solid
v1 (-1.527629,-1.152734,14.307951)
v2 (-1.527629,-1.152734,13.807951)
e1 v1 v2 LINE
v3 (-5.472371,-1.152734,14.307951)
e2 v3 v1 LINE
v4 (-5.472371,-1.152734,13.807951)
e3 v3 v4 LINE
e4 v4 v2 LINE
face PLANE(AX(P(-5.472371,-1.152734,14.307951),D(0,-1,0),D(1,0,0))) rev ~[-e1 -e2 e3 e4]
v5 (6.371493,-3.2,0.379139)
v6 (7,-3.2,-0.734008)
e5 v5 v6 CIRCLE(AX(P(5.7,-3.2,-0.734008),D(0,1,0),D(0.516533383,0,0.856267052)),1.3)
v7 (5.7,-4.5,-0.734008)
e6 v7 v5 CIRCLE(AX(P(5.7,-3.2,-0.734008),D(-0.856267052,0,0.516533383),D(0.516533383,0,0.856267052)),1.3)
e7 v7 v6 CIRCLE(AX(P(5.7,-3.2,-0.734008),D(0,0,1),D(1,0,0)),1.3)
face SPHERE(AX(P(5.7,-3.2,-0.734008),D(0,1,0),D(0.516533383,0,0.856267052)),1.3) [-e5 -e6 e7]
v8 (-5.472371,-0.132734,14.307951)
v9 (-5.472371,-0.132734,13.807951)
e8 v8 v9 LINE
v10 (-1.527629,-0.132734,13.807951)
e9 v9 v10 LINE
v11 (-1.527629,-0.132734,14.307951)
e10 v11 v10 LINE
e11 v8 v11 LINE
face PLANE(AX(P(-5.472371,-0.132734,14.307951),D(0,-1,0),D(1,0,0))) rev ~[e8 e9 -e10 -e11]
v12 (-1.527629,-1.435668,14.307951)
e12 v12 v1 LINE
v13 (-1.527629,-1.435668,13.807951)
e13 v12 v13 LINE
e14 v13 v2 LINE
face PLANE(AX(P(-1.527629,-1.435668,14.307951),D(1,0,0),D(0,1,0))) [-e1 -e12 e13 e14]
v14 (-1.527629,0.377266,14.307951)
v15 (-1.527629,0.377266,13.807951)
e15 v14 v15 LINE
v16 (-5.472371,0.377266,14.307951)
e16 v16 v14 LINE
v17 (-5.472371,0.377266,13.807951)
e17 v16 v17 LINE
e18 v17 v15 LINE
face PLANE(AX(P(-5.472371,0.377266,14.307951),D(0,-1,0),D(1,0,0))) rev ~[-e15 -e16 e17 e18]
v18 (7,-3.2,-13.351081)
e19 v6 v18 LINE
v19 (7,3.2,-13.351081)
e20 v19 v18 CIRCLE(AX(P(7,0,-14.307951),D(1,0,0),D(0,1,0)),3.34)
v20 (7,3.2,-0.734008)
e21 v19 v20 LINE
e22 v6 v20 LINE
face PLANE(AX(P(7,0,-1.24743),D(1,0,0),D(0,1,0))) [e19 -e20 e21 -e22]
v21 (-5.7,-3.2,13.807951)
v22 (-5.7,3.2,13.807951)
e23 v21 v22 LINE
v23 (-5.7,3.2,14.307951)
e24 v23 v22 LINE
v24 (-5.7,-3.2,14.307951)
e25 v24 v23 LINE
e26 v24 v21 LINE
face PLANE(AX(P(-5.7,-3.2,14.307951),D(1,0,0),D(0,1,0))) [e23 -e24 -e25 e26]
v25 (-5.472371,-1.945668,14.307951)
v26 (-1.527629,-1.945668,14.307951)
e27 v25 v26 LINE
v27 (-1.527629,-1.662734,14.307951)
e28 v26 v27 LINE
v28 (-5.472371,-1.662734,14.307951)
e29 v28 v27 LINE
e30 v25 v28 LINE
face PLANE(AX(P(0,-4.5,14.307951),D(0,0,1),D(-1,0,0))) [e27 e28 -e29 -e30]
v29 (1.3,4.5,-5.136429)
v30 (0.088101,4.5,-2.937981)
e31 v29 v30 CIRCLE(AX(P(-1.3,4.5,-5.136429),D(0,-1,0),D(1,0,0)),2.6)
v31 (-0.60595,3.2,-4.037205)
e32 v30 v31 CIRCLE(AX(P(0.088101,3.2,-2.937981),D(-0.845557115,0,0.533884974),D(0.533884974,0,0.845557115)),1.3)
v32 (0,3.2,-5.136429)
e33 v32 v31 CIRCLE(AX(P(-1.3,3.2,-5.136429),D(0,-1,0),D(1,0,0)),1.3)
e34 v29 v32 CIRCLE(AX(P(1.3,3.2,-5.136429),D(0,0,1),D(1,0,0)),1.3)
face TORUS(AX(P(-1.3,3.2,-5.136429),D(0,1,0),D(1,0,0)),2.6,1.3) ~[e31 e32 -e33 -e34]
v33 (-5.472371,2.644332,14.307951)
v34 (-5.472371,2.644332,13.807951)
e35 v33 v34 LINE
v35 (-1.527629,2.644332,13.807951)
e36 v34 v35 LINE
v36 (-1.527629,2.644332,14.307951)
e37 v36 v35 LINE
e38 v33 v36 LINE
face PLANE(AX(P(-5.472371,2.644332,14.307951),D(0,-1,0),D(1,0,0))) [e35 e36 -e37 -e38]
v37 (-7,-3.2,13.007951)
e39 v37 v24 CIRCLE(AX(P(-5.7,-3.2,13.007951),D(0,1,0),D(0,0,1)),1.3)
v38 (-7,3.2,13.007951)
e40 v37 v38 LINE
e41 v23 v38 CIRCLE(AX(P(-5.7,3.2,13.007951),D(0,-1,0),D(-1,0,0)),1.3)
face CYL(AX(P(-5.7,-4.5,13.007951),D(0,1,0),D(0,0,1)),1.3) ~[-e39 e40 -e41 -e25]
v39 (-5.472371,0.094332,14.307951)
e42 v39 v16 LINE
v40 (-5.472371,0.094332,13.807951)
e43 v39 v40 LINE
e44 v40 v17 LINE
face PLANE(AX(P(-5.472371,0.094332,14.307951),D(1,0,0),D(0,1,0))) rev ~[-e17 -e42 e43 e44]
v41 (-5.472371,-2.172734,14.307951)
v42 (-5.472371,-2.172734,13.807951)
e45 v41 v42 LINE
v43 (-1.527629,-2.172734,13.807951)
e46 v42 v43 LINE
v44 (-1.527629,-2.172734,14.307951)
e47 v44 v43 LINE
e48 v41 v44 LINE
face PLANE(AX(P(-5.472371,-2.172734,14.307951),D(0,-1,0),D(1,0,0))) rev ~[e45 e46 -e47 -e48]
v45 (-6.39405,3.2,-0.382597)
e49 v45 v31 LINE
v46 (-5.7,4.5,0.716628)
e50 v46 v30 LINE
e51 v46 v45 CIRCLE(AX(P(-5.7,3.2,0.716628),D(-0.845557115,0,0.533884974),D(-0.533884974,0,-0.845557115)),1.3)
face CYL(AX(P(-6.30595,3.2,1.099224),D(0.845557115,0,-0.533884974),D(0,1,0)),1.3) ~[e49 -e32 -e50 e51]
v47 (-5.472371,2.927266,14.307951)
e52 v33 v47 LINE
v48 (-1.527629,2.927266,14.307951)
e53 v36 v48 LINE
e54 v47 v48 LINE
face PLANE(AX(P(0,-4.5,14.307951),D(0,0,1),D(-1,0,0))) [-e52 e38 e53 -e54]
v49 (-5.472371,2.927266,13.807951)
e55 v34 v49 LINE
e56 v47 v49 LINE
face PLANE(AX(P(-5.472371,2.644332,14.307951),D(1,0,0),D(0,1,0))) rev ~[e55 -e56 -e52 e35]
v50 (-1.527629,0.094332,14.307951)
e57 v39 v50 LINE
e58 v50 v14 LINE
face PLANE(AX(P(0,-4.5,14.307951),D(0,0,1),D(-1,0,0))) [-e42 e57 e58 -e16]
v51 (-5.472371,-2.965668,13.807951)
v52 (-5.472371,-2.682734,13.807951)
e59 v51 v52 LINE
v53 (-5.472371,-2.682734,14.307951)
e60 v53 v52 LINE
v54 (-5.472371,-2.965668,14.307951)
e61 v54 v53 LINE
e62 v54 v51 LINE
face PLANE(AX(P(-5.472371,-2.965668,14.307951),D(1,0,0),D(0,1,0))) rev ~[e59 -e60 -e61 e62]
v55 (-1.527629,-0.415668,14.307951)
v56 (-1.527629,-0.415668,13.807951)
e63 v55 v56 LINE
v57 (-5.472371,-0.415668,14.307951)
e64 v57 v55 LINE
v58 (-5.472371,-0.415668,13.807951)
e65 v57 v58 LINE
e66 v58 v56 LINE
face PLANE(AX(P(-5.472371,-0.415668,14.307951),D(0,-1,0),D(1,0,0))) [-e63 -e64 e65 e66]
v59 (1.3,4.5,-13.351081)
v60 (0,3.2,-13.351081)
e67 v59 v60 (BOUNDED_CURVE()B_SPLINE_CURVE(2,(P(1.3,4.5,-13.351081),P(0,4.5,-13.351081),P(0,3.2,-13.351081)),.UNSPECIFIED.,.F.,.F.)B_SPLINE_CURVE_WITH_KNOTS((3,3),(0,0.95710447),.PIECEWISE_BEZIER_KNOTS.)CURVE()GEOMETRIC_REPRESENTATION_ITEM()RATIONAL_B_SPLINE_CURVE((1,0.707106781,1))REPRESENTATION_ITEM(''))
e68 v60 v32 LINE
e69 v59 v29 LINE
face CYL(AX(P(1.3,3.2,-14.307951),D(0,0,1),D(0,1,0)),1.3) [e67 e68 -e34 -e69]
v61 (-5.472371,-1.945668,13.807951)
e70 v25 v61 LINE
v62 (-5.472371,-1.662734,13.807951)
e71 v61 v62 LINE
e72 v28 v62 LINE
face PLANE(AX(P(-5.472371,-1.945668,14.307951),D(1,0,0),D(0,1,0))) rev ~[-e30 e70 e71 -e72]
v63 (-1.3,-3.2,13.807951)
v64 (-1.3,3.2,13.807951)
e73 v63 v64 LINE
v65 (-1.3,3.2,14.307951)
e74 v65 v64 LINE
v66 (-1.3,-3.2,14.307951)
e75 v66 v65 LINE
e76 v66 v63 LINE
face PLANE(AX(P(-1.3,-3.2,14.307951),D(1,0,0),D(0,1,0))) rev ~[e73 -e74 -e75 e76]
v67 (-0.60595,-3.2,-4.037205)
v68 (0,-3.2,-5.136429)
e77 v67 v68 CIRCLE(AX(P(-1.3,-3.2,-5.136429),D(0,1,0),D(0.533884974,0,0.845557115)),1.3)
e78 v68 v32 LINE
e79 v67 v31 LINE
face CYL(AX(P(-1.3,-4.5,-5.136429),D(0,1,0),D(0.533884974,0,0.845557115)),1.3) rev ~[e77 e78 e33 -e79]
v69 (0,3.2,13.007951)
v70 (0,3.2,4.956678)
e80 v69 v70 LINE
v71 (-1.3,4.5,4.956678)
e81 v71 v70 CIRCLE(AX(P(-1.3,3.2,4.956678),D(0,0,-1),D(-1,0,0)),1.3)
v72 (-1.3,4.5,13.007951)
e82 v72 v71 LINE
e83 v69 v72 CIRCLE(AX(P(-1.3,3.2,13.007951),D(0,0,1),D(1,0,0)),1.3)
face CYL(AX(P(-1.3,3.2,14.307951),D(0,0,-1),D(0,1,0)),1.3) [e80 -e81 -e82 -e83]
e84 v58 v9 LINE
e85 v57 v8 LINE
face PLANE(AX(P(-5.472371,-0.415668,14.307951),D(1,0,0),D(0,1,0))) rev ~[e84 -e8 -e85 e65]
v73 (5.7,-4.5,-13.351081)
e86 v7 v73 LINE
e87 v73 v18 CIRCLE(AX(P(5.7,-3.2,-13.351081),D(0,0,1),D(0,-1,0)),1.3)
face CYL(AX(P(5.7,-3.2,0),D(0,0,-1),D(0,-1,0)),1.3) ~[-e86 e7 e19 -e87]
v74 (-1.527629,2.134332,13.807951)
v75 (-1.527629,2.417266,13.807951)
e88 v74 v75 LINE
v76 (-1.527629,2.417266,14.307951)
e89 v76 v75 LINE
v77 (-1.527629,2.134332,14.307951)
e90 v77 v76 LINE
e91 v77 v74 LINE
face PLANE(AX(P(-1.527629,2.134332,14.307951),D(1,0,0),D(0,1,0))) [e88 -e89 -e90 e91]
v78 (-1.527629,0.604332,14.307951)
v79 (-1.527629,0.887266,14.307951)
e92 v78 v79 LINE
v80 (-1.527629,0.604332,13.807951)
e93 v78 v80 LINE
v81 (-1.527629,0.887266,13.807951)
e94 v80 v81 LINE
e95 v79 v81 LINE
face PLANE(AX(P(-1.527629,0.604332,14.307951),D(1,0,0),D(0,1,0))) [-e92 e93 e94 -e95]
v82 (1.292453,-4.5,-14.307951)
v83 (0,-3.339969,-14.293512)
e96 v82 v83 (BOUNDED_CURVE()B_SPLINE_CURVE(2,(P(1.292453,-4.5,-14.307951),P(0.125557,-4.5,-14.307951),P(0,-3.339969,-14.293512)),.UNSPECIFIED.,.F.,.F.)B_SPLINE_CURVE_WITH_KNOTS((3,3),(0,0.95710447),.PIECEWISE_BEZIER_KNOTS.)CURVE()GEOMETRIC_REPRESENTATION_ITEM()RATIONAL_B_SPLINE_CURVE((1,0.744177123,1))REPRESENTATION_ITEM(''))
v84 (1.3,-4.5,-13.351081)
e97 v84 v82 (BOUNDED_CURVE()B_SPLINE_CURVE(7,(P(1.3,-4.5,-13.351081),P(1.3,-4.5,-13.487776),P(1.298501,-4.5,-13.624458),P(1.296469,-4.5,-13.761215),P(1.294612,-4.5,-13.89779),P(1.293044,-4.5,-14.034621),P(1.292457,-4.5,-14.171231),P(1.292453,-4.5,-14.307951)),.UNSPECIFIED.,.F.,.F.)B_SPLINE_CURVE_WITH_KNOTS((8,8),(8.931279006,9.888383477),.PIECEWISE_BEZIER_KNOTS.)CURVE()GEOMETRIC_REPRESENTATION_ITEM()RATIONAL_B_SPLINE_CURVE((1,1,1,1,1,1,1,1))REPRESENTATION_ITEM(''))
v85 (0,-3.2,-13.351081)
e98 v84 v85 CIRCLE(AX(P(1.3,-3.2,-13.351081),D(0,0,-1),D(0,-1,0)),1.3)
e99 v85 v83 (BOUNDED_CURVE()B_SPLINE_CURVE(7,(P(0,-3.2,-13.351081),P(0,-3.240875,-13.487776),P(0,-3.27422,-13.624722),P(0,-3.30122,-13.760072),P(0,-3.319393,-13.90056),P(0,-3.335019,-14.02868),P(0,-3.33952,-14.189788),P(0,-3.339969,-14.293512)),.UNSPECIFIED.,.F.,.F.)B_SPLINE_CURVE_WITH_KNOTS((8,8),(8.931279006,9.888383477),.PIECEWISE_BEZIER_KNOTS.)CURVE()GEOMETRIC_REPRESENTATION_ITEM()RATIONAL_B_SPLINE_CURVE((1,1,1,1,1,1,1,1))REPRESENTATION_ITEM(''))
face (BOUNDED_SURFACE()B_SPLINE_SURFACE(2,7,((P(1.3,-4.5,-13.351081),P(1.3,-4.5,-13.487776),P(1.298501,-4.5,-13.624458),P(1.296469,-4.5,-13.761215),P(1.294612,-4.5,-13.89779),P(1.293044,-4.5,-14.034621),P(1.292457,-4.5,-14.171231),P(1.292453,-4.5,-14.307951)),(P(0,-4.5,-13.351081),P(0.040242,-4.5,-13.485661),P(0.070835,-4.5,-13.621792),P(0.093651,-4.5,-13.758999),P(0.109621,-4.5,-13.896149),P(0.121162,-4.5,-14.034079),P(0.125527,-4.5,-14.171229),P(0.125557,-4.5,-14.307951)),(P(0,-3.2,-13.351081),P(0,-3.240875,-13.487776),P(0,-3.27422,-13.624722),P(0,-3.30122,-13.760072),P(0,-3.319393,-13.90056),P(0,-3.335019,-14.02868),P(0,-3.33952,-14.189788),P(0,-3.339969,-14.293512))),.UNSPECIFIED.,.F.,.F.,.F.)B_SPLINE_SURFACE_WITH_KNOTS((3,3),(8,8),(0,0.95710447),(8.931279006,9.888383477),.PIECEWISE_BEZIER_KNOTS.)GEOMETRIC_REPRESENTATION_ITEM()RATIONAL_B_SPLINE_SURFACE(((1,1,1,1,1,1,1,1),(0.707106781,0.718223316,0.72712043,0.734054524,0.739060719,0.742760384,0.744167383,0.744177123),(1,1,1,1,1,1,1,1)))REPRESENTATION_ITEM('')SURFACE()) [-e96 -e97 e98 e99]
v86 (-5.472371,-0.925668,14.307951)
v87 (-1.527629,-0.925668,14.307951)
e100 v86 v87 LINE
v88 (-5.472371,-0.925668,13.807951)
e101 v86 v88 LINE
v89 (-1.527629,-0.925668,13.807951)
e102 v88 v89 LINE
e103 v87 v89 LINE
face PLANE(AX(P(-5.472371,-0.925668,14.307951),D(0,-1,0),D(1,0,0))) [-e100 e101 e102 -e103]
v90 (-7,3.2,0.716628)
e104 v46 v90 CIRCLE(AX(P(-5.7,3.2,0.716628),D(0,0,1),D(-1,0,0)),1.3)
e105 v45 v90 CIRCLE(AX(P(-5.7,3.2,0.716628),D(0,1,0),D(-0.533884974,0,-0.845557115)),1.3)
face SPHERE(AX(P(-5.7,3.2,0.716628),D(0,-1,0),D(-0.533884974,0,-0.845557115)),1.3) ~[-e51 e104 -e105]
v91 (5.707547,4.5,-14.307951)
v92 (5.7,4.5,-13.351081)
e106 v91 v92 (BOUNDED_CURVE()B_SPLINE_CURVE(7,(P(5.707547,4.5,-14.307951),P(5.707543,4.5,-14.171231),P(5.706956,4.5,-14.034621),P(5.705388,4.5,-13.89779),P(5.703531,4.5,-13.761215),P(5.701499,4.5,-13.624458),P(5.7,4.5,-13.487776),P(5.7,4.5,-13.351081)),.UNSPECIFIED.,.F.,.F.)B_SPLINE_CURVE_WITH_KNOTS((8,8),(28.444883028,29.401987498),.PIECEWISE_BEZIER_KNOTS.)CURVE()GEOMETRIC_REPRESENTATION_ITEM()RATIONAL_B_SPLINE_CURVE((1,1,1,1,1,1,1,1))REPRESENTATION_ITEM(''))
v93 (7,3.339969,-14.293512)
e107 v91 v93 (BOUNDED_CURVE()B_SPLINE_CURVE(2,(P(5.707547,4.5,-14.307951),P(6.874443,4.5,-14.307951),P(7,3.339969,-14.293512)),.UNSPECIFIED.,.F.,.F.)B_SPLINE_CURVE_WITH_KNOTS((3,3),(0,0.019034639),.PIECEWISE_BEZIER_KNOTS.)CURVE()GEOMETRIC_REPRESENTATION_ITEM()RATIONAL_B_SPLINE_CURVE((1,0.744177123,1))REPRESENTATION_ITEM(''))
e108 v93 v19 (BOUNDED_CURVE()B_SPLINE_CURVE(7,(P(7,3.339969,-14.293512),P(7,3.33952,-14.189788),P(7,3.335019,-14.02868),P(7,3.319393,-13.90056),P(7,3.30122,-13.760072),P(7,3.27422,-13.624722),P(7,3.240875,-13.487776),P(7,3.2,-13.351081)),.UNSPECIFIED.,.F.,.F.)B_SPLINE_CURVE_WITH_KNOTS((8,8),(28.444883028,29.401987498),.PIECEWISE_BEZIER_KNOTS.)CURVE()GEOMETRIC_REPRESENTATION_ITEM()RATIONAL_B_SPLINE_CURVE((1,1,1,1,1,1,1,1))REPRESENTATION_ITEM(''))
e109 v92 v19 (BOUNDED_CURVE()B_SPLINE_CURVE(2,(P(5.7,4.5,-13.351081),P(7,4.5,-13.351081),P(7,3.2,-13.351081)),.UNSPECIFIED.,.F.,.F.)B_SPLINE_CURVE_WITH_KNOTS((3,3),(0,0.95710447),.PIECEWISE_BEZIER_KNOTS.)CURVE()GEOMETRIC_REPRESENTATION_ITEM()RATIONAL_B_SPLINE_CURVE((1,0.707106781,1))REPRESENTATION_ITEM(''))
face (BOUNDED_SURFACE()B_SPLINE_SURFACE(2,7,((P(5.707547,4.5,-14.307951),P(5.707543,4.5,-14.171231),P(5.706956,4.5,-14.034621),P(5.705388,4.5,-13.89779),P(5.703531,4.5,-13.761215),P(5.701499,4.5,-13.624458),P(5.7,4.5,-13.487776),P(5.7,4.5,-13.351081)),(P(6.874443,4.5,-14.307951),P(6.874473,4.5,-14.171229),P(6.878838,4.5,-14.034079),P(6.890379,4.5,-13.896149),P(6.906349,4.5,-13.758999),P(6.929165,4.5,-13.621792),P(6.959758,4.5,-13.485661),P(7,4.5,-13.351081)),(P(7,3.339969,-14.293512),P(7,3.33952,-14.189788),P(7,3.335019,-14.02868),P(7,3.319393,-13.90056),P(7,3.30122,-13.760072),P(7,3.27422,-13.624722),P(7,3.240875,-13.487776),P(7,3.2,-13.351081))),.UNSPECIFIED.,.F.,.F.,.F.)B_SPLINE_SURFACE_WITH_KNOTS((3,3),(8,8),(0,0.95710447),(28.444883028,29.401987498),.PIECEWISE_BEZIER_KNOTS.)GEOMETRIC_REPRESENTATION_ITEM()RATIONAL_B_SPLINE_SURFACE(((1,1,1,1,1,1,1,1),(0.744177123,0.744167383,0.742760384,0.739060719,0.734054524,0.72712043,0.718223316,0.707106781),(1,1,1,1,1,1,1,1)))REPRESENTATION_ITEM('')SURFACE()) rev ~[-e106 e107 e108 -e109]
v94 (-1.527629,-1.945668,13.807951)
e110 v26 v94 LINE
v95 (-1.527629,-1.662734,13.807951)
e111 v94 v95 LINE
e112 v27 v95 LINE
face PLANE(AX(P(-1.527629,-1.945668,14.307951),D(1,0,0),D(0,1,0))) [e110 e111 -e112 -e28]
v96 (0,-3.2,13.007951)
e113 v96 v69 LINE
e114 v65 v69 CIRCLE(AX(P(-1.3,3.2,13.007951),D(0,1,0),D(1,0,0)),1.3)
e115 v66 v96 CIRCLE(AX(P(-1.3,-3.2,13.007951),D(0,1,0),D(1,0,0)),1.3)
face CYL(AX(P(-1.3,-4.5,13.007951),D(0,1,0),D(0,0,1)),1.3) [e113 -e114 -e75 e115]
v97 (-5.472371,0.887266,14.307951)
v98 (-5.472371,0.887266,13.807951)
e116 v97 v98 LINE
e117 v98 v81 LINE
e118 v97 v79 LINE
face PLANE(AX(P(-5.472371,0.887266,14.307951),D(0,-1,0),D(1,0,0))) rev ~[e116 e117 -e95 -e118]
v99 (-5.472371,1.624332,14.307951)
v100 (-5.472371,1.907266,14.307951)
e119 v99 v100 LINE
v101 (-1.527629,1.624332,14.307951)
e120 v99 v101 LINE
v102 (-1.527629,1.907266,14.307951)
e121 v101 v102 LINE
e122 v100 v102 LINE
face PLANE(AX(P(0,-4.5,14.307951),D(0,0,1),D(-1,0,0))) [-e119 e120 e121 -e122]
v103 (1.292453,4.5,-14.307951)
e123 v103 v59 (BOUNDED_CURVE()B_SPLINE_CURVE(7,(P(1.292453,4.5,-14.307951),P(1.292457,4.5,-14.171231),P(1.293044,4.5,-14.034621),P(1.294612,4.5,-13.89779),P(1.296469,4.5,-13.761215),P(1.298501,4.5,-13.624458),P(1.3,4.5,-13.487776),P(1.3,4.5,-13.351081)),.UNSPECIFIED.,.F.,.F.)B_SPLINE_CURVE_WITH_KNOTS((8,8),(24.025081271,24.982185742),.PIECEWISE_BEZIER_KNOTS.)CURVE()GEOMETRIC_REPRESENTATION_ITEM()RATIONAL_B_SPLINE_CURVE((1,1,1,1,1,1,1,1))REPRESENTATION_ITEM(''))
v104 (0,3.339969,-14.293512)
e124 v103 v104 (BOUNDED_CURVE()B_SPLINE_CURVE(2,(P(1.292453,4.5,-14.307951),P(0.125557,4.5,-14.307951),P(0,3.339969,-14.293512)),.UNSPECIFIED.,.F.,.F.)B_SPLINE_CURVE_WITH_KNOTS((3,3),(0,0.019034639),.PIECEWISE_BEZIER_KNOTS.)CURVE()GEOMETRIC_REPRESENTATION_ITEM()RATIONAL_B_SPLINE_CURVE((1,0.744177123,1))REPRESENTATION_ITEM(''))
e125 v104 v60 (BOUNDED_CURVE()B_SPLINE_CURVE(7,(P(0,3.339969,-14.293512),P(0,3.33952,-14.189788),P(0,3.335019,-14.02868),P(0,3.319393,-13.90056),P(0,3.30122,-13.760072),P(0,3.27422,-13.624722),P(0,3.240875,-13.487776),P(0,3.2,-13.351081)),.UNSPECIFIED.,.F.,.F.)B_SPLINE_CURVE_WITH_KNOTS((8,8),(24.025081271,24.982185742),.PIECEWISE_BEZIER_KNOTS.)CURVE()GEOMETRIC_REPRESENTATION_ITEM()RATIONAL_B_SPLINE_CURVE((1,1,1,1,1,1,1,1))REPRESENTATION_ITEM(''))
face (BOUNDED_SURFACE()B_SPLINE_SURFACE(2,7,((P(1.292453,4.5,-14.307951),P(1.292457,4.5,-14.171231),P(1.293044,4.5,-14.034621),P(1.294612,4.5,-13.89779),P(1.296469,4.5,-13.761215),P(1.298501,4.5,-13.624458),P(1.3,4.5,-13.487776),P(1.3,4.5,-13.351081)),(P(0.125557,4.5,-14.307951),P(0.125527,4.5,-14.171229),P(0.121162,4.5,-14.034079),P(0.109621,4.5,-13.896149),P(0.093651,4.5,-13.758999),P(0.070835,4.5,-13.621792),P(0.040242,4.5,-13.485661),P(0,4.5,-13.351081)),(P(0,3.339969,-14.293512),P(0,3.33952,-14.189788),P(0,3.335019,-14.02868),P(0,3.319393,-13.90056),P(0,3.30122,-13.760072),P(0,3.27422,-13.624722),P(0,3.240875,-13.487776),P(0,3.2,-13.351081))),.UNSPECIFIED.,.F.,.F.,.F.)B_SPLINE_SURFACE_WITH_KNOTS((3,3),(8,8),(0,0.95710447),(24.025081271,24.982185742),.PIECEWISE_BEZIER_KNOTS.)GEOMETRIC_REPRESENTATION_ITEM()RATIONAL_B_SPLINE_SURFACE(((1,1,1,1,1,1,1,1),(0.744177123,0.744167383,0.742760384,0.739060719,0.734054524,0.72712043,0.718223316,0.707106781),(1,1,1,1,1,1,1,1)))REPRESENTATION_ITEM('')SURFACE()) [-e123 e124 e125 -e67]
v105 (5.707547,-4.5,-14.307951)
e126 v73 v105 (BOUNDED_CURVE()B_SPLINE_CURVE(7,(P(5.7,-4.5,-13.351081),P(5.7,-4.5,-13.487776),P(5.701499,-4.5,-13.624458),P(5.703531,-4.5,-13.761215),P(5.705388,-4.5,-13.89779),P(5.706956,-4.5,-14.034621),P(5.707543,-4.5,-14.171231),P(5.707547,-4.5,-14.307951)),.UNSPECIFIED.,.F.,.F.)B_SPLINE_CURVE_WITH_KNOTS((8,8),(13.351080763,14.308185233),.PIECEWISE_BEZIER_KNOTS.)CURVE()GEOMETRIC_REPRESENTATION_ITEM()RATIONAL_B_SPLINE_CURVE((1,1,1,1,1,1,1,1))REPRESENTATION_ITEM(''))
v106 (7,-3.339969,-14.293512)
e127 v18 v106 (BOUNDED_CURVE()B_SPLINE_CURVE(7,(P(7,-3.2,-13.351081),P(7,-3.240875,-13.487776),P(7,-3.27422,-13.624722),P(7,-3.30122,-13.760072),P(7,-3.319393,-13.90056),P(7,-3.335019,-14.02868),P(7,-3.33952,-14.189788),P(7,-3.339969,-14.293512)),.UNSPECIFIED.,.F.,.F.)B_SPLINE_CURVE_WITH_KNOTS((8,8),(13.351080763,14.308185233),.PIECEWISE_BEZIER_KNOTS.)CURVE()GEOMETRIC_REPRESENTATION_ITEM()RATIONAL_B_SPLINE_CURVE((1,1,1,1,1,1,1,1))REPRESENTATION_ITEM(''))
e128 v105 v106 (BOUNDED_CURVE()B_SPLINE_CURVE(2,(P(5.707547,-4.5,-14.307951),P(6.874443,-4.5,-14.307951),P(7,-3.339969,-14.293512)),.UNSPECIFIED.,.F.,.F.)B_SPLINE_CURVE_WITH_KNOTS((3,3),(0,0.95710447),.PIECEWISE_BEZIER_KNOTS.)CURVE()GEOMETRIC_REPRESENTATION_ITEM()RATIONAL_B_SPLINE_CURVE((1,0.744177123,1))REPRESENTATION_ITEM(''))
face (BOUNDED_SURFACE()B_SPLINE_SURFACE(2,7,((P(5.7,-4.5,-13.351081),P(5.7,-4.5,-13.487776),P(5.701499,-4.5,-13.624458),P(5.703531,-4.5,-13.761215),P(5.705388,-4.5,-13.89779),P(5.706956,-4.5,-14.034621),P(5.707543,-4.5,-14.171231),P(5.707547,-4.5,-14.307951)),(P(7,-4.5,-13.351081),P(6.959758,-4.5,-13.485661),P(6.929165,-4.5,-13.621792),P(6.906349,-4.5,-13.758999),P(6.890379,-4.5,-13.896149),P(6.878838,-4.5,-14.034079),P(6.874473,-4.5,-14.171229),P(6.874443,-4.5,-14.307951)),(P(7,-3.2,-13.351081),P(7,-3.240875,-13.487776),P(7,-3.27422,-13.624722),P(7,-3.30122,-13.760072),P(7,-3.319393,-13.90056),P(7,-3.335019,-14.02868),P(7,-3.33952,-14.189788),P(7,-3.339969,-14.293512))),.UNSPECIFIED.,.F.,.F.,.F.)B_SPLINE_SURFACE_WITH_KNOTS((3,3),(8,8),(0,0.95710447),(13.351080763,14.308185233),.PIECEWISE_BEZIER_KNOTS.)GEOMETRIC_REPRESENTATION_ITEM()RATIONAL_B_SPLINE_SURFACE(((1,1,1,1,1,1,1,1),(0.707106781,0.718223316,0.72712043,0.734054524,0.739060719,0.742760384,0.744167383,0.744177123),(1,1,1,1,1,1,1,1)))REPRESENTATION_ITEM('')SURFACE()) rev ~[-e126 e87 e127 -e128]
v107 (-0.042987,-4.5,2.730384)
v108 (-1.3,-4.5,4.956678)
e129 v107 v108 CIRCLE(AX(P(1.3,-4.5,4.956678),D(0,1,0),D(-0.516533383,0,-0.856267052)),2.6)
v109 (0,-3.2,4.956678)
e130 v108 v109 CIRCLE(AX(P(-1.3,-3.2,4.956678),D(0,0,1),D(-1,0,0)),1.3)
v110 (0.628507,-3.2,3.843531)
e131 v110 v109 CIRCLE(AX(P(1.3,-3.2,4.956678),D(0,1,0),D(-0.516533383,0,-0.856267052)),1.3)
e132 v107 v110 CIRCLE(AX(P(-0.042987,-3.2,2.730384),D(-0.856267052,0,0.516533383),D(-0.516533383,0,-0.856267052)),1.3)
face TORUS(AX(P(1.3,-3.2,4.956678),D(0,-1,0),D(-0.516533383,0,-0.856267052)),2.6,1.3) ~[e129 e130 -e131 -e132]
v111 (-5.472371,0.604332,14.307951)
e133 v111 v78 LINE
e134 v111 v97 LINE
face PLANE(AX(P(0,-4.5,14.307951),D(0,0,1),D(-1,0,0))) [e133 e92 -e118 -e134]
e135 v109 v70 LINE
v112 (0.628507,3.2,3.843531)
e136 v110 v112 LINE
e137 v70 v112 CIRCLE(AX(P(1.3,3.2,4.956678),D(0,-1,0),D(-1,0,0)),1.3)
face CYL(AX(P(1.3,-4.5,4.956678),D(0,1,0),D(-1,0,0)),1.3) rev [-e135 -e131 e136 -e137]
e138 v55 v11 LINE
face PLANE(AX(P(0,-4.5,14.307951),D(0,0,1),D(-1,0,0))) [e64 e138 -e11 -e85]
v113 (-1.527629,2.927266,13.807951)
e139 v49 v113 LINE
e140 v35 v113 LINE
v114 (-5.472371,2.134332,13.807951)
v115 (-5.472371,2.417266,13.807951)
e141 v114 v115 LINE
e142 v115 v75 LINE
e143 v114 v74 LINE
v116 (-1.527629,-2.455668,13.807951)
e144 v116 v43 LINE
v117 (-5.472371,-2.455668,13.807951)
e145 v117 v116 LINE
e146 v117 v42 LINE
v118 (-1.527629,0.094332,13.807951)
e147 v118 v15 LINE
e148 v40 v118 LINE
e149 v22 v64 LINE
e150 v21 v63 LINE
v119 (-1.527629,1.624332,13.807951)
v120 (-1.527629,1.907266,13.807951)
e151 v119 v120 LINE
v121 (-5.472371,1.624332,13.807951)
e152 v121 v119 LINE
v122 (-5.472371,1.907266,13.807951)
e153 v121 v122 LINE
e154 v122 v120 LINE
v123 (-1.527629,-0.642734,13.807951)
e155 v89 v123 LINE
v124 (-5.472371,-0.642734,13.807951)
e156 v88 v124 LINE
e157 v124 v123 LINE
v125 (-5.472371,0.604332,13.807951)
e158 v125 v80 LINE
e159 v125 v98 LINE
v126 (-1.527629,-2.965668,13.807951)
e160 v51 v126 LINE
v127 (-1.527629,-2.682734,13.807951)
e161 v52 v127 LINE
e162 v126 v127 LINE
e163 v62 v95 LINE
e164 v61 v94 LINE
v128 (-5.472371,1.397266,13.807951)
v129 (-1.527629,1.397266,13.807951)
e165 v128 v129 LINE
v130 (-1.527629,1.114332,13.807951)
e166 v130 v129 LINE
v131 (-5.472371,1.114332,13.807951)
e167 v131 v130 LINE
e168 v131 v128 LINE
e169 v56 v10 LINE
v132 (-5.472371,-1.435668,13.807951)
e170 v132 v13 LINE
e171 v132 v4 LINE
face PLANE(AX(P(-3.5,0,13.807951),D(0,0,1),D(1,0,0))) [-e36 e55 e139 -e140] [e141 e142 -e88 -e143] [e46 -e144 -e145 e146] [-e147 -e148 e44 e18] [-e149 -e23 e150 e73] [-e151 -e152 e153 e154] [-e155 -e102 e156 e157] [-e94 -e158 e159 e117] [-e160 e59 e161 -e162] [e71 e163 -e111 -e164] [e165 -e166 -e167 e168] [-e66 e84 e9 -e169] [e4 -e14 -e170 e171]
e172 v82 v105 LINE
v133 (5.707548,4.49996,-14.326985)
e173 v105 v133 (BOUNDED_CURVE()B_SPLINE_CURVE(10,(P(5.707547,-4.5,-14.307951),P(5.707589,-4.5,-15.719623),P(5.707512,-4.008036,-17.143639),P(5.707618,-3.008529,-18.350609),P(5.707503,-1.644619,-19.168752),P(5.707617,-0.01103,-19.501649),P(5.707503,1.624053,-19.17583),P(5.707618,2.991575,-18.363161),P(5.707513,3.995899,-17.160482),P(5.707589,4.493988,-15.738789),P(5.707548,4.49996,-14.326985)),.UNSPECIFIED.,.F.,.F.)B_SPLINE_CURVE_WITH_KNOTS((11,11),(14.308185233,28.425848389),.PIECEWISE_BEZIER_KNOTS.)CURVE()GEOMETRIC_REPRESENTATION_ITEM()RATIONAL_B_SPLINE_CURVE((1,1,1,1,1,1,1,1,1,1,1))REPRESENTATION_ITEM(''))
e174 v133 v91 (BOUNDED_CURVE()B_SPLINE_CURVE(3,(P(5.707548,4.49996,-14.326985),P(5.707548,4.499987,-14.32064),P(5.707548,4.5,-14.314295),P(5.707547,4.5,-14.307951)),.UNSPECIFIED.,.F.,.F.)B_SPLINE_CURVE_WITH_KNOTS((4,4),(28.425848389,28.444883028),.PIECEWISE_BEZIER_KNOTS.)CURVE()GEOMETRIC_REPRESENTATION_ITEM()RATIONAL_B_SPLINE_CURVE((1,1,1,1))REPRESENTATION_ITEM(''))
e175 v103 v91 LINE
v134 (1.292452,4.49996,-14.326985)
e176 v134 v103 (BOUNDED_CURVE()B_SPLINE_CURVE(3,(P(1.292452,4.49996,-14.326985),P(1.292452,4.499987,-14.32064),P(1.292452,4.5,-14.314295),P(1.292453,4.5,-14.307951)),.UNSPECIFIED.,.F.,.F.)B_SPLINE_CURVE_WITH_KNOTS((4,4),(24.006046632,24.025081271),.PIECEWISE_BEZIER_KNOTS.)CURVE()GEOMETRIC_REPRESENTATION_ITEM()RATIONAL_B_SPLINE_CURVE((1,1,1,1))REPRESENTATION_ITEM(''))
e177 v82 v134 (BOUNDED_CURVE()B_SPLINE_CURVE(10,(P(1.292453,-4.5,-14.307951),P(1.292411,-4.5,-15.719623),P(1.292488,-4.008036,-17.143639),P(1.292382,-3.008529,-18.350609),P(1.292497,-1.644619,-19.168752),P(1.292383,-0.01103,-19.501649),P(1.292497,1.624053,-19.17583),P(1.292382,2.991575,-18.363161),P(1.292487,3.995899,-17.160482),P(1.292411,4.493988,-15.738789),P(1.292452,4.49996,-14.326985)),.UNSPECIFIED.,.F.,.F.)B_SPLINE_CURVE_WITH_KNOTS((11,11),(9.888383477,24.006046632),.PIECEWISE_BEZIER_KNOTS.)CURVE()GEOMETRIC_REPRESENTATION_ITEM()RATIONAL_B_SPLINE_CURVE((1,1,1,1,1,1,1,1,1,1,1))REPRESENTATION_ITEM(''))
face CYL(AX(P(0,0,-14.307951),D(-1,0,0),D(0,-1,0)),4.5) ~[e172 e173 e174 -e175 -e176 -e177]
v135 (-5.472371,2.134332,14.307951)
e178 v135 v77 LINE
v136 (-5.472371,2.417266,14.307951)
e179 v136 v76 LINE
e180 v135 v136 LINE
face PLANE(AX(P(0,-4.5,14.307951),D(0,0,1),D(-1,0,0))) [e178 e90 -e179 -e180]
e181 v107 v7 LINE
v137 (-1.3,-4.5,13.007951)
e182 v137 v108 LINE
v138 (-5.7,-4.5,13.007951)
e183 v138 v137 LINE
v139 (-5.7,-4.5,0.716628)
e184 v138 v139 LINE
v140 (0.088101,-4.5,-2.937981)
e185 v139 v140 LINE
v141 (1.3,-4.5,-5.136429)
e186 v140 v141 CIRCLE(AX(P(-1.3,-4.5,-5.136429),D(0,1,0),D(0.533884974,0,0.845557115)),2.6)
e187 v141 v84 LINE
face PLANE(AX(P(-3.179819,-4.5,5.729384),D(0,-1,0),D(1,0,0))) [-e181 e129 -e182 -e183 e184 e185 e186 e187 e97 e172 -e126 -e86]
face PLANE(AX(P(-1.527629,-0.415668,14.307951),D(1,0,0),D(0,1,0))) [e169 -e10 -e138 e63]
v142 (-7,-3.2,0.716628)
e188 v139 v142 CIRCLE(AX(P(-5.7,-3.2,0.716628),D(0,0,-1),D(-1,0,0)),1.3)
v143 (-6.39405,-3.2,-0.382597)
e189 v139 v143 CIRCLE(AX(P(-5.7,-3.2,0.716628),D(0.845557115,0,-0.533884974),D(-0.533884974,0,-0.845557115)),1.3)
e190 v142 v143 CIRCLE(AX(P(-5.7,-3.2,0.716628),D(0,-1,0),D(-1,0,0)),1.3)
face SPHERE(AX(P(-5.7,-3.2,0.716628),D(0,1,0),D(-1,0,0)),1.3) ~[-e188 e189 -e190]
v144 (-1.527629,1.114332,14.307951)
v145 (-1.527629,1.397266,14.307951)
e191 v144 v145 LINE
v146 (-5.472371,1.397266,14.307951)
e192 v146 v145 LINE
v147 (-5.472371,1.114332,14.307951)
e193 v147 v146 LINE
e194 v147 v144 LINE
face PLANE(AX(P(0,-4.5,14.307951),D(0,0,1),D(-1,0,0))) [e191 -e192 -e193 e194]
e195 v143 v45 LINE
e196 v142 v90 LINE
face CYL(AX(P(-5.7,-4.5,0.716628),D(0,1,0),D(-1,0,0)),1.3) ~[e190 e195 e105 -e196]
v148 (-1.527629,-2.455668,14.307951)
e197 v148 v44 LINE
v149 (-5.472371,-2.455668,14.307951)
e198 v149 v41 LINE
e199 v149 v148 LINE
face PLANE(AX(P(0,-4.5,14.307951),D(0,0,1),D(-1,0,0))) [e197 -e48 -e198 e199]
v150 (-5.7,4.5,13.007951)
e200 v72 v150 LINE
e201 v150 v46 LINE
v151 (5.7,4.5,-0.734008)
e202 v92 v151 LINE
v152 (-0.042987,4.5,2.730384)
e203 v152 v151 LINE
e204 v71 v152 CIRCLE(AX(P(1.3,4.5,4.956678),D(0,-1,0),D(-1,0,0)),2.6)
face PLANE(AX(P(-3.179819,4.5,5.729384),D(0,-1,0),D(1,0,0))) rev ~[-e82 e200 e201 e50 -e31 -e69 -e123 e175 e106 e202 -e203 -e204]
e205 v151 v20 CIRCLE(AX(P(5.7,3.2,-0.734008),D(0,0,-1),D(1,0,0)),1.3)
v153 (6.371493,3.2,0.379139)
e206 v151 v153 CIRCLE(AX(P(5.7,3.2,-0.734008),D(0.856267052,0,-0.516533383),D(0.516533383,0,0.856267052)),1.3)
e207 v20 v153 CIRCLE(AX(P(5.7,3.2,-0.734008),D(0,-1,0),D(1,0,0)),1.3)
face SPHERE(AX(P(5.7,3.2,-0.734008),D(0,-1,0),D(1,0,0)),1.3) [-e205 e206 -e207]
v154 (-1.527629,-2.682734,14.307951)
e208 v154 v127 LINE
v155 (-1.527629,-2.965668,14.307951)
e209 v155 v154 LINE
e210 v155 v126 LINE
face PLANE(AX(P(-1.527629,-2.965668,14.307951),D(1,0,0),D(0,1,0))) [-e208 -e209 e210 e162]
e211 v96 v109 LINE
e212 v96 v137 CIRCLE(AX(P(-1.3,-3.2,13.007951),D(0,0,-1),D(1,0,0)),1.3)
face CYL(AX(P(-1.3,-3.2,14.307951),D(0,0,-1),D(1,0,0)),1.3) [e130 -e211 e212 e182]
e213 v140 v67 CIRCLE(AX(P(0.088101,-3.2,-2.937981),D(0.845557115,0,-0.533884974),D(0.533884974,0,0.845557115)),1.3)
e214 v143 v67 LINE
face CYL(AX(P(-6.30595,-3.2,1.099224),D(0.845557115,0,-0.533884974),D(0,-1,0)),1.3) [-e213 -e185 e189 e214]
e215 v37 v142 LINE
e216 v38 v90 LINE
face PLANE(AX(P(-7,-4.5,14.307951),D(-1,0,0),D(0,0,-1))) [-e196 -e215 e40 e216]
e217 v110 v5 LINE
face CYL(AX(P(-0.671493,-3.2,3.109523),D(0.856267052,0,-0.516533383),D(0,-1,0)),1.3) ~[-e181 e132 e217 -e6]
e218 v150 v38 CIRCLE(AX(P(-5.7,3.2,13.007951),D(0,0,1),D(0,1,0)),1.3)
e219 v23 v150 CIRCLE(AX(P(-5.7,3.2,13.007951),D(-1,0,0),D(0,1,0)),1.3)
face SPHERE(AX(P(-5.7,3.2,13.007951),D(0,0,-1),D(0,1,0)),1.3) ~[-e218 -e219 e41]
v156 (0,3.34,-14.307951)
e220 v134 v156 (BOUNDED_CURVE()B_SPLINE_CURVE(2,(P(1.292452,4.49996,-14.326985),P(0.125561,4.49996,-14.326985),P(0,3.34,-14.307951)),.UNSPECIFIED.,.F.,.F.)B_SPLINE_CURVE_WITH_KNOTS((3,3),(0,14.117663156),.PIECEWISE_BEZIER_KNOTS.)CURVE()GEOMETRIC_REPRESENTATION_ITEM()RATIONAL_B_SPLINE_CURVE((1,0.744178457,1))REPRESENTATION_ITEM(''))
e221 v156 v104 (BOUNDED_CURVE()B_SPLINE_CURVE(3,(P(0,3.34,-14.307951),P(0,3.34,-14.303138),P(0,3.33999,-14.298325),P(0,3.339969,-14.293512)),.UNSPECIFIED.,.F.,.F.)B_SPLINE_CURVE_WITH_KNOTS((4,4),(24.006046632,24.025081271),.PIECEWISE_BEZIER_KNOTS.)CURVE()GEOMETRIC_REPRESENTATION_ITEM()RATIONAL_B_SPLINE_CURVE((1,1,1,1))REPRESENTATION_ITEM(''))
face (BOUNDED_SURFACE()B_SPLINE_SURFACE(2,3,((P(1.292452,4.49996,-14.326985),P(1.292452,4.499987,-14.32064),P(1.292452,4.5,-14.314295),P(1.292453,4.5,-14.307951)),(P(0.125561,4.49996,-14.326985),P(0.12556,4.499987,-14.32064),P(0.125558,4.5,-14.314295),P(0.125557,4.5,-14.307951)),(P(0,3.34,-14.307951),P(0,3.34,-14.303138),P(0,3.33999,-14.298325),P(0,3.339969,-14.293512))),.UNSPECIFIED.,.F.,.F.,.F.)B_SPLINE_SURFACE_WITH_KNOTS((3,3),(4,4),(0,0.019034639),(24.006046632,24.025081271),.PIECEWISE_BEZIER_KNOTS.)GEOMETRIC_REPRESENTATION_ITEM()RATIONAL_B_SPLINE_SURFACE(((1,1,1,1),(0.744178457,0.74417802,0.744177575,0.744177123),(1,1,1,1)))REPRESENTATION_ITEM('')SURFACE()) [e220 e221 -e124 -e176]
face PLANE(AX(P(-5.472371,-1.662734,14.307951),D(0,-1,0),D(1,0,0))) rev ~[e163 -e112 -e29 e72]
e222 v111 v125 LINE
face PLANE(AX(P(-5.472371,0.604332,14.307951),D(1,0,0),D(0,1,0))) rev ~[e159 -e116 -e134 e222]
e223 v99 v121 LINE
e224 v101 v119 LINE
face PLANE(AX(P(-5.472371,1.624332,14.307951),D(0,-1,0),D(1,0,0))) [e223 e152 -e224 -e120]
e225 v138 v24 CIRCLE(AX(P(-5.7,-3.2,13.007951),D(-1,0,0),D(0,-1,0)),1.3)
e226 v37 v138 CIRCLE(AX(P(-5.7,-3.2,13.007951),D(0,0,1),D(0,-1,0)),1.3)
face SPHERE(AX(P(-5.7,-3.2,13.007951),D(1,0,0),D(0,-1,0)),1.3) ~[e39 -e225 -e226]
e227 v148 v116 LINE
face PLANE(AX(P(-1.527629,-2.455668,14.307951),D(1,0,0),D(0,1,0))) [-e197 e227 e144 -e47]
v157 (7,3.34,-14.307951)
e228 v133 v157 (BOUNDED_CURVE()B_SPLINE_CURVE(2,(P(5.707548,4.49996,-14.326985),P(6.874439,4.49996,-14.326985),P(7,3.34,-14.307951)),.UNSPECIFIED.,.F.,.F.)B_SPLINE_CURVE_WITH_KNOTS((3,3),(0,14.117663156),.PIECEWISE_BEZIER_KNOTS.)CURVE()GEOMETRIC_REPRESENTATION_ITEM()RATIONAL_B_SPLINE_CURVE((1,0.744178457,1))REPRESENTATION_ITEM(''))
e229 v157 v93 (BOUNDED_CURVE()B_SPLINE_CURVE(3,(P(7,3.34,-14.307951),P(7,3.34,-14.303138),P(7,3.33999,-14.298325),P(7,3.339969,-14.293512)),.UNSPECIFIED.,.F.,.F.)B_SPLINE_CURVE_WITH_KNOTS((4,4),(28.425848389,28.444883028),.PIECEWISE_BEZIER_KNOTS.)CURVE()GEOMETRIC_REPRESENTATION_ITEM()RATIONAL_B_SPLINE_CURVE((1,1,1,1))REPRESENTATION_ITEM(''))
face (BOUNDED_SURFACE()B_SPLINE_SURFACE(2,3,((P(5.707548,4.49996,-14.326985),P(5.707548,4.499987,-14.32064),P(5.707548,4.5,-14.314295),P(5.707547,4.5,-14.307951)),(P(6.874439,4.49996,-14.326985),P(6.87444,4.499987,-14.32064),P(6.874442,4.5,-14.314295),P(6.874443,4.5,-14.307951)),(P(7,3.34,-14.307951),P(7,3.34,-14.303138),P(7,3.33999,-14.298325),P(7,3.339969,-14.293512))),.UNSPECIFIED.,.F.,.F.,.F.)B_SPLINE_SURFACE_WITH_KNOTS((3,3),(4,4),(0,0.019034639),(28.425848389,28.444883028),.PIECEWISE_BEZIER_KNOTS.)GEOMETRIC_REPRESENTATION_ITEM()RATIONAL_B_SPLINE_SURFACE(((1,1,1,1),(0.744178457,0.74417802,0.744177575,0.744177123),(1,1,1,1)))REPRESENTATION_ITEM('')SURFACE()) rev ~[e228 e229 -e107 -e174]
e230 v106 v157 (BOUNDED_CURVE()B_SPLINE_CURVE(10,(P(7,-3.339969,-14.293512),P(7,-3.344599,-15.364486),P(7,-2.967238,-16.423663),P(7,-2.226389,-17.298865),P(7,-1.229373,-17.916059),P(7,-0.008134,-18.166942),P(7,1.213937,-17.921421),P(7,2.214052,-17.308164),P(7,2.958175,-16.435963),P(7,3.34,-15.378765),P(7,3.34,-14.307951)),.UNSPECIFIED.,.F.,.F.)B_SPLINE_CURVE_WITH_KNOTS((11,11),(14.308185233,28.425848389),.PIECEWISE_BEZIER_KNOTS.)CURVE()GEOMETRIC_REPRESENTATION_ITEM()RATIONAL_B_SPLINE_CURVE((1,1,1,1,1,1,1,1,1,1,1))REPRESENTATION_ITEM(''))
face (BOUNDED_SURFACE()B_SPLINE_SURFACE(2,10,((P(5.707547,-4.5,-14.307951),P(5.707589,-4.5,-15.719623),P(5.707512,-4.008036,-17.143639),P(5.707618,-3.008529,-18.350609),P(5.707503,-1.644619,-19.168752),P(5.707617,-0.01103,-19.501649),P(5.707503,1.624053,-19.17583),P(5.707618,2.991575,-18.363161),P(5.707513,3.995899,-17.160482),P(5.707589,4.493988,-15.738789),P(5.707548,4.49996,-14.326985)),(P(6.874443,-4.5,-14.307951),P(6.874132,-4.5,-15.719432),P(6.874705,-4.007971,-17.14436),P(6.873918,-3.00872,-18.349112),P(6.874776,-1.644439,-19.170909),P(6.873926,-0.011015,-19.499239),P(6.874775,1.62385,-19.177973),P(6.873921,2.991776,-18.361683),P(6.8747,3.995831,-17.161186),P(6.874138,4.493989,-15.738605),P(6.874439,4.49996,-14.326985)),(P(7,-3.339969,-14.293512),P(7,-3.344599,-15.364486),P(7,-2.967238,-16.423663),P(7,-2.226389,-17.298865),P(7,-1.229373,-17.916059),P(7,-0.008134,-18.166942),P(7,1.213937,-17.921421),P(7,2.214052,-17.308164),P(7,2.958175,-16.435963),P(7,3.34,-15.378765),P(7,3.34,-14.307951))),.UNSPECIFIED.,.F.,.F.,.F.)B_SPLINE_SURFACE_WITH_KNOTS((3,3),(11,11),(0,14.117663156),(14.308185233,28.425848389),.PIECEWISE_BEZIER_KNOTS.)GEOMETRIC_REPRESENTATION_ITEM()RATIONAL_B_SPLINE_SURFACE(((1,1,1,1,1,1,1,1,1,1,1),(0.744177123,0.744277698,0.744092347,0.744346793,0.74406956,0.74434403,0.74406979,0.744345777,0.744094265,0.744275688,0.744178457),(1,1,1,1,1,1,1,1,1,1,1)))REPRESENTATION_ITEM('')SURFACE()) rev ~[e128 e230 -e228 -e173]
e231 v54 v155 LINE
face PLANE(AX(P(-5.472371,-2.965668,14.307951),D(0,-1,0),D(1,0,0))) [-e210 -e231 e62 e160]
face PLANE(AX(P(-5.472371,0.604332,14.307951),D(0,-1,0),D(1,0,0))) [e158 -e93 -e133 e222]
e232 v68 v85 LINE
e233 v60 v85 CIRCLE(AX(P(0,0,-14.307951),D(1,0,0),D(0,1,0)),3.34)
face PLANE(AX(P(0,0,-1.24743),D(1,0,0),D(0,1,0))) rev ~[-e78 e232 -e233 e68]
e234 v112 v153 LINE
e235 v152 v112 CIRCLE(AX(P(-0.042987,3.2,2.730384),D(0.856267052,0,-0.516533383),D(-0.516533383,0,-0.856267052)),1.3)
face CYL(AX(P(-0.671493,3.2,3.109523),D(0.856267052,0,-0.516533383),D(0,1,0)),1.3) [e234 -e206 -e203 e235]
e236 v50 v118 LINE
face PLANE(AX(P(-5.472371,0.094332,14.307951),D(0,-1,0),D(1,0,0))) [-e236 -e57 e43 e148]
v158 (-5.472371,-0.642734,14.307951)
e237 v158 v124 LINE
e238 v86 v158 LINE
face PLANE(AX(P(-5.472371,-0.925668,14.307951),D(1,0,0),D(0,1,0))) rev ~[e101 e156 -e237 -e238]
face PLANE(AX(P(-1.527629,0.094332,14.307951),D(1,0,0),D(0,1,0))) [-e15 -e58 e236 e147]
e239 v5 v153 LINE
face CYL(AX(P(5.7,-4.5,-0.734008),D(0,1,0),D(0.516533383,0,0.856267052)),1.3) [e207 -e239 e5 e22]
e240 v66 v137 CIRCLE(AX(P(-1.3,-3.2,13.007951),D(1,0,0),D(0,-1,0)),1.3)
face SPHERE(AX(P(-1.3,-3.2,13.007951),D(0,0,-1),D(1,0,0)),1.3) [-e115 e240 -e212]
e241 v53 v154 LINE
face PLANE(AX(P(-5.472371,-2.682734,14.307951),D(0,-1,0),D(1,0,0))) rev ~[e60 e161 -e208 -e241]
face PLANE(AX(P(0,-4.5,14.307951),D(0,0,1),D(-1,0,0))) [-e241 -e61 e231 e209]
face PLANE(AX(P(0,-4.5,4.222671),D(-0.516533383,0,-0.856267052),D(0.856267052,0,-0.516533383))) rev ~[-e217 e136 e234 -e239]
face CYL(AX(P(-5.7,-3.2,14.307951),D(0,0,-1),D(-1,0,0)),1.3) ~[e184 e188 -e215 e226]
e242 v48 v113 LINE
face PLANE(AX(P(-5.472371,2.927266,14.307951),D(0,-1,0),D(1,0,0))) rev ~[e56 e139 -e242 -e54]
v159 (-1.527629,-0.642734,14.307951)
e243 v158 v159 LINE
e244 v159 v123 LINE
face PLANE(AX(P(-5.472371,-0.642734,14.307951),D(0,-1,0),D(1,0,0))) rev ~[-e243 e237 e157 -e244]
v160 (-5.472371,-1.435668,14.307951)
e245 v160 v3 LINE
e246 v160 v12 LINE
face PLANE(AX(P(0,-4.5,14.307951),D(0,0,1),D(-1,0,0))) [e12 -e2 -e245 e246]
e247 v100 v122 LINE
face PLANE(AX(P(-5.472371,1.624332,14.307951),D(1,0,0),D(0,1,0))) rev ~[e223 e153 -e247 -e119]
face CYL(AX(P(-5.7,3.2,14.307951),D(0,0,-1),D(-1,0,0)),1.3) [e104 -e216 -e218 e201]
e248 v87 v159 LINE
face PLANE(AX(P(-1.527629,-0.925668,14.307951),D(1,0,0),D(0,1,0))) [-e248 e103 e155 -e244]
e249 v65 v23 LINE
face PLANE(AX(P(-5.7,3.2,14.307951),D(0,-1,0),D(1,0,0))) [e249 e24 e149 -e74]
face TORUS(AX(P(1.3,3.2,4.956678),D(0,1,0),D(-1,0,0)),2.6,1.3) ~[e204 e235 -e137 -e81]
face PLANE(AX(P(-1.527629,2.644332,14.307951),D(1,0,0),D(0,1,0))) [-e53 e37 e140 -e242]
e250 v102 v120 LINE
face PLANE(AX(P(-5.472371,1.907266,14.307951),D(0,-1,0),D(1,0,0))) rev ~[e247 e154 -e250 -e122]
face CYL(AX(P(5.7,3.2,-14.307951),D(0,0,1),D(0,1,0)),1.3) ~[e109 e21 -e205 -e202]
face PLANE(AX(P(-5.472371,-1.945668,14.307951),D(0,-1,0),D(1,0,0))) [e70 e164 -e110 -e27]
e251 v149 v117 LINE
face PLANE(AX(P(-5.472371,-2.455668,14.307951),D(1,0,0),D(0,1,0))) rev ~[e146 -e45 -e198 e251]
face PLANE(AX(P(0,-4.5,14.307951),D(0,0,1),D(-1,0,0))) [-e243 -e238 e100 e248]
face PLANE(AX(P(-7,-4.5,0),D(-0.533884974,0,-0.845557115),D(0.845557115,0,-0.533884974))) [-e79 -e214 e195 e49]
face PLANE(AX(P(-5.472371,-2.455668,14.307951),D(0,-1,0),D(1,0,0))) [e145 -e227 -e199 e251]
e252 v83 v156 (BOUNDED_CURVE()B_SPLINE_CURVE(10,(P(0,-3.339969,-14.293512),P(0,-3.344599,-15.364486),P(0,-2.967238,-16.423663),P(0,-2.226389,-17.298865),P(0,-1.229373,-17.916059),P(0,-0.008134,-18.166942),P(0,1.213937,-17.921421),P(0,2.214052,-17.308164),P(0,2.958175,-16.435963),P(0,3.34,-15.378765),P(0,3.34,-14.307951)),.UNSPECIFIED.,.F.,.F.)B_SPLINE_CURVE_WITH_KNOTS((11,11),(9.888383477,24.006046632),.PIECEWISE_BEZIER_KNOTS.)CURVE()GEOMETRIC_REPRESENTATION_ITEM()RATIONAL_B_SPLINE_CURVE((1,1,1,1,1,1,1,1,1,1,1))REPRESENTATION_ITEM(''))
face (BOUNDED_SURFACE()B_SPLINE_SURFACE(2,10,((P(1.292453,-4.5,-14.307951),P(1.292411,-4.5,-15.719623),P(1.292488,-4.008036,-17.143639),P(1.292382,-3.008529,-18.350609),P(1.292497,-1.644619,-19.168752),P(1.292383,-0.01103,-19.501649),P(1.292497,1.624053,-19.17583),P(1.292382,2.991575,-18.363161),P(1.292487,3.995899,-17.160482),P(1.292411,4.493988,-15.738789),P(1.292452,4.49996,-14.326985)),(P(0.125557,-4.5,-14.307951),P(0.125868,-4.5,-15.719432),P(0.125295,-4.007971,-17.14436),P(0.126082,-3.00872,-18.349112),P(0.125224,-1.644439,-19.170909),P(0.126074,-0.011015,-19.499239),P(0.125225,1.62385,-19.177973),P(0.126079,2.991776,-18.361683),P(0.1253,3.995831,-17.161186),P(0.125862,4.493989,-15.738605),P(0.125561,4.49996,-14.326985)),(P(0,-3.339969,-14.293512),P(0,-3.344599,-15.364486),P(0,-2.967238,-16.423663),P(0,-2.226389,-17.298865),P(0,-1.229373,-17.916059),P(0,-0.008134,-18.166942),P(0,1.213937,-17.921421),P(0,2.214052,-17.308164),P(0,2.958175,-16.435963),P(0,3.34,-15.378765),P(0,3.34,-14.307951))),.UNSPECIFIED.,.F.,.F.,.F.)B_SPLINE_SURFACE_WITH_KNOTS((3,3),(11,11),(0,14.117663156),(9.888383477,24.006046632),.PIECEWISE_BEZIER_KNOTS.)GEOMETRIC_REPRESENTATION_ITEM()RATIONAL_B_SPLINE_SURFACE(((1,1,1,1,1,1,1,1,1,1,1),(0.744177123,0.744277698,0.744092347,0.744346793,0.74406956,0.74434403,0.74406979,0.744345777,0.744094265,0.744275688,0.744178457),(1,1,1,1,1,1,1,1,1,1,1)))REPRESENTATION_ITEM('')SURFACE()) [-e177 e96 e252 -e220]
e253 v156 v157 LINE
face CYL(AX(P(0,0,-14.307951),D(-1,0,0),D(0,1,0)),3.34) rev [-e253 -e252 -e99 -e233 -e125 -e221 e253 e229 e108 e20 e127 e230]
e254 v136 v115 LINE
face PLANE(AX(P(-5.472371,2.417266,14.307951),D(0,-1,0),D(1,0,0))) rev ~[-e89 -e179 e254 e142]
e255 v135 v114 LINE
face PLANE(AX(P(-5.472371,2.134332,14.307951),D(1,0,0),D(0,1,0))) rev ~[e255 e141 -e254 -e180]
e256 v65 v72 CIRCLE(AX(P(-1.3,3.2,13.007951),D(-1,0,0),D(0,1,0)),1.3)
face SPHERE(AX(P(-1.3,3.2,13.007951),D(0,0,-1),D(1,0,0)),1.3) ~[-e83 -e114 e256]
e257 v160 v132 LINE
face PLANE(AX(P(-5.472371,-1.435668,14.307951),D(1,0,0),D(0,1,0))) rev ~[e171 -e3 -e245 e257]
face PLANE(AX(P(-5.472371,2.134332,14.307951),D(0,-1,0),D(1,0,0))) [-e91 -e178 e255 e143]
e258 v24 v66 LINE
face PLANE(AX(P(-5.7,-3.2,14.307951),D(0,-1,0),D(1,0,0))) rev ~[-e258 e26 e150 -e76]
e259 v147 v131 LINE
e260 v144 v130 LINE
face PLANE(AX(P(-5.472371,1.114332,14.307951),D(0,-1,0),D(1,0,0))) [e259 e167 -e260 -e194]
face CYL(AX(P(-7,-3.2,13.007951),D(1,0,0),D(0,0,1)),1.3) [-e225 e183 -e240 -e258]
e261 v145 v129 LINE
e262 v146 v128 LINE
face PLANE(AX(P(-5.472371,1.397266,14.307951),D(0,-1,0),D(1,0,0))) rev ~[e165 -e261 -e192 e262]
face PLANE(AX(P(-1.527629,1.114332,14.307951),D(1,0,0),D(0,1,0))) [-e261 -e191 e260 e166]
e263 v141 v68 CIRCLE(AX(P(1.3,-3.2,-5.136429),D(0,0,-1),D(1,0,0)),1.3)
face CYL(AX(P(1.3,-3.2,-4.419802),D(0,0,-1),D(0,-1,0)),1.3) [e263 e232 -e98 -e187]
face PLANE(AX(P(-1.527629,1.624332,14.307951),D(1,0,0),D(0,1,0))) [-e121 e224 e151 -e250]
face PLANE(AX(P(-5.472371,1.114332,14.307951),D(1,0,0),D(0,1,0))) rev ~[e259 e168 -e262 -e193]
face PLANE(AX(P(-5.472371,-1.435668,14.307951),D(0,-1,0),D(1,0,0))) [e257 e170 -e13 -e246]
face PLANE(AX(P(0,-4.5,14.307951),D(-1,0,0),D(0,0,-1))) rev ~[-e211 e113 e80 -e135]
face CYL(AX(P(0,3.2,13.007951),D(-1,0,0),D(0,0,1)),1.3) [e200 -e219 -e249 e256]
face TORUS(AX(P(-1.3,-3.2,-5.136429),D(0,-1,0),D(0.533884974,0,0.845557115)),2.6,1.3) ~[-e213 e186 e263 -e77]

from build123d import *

# Parameters (mm, degrees)
F0_R     = 3.34
F1_DEPTH = 7
F3_DEPTH = 9
F4_DEPTH = 9.001
F5_R     = 1.3
F6_W     = 3.9447422773
F6_H     = 0.2829339355
F6_W_2   = 4.4
F6_H_2   = 6.4
F7_DEPTH = 0.5


# Not quite as in the source:
# - a feature names something its author has since deleted; it is built from what else it names


with BuildPart() as f1:
    # F0 (on Right) → F1 (new body)
    with BuildSketch(Plane.YZ):
        with BuildLine():
            Line((4.5, -14.3079506601), (4.5, 14.3079506601))
            Line((4.5, 14.3079506601), (-4.5, 14.3079506601))
            Line((-4.5, 14.3079506601), (-4.5, -14.3079506601))
            ThreePointArc((-4.5, -14.3079506601), (0, -18.8079506601), (4.5, -14.3079506601))
        make_face()
        with Locations((0, -14.3079506601)):
            Circle(F0_R, mode=Mode.SUBTRACT)
    extrude(amount=F1_DEPTH)

    # F2 (on face) → F3 (join)
    with BuildSketch(Plane.XZ.offset(4.5)):
        Polygon((0, 4.22267057), (0, 14.3079506601), (-7, 14.3079506601), (-7, 0), (0, -4.4198017567), align=None)
    extrude(amount=-F3_DEPTH)

    # F2 (on face) → F4 (cut, through all)
    with BuildSketch(Plane.XZ.offset(4.5)):
        Polygon((7, 14.3079506601), (0, 14.3079506601), (0, 4.22267057), (7, 0), align=None)
    extrude(amount=-F4_DEPTH, mode=Mode.SUBTRACT)

    # F5
    f5_edges = [f1.edges().sort_by_distance(p)[0] for p in [
        (0, -4.5, 9.265311),
        (0, 0, 4.222671),
        (0, 4.5, 9.265311),
        (0, 0, 14.307951),
        (3.5, -4.5, 2.111335),
        (-3.5, -4.5, 14.307951),
        (-7, -4.5, 7.153975),
        (-3.5, -4.5, -2.209901),
        (0, -4.5, -9.363876),
        (3.5, -4.5, -14.307951),
        (7, -4.5, -7.153975),
        (0, 4.5, -9.363876),
        (-3.5, 4.5, -2.209901),
        (-7, 4.5, 7.153975),
        (-3.5, 4.5, 14.307951),
        (3.5, 4.5, 2.111335),
        (7, 4.5, -7.153975),
        (3.5, 4.5, -14.307951),
        (-7, 0, 14.307951),
        (-7, 0, 0),
        (7, 0, 0),
        (0, 0, -4.419802),
    ]]
    fillet(f5_edges, radius=F5_R)

    # F6 (on face) → F7 (cut)
    with BuildSketch(Plane.XY.offset(14.3079506601)):
        with Locations((46.5, 2.275798656)):
            Rectangle(F6_W, F6_H)
        with Locations((46.5, 0.2357986942)):
            Rectangle(F6_W, F6_H)
        with Locations((46.5, -1.8042012677)):
            Rectangle(F6_W, F6_H)
        with Locations((46.5, 0.7457986847)):
            Rectangle(F6_W, F6_H)
        with Locations((46.5, 1.2557986751)):
            Rectangle(F6_W, F6_H)
        with Locations((46.5, -2.3142012581)):
            Rectangle(F6_W, F6_H)
        with Locations((46.5, 2.7857986465)):
            Rectangle(F6_W, F6_H)
        with Locations((46.5, -0.2742012963)):
            Rectangle(F6_W, F6_H)
        with Locations((46.5, -1.2942012772)):
            Rectangle(F6_W, F6_H)
        with Locations((46.5, 1.7657986656)):
            Rectangle(F6_W, F6_H)
        with Locations((46.5, -0.7842012867)):
            Rectangle(F6_W, F6_H)
        with Locations((46.5, -2.8242012486)):
            Rectangle(F6_W, F6_H)
        with Locations((-3.5, 0)):
            Rectangle(F6_W_2, F6_H_2)
        with Locations((-3.5, -2.8242012486)):
            Rectangle(F6_W, F6_H, mode=Mode.SUBTRACT)
        with Locations((-3.5, -2.3142012581)):
            Rectangle(F6_W, F6_H, mode=Mode.SUBTRACT)
        with Locations((-3.5, -1.8042012677)):
            Rectangle(F6_W, F6_H, mode=Mode.SUBTRACT)
        with Locations((-3.5, -1.2942012772)):
            Rectangle(F6_W, F6_H, mode=Mode.SUBTRACT)
        with Locations((-3.5, -0.7842012867)):
            Rectangle(F6_W, F6_H, mode=Mode.SUBTRACT)
        with Locations((-3.5, -0.2742012963)):
            Rectangle(F6_W, F6_H, mode=Mode.SUBTRACT)
        with Locations((-3.5, 0.2357986942)):
            Rectangle(F6_W, F6_H, mode=Mode.SUBTRACT)
        with Locations((-3.5, 0.7457986847)):
            Rectangle(F6_W, F6_H, mode=Mode.SUBTRACT)
        with Locations((-3.5, 1.2557986751)):
            Rectangle(F6_W, F6_H, mode=Mode.SUBTRACT)
        with Locations((-3.5, 1.7657986656)):
            Rectangle(F6_W, F6_H, mode=Mode.SUBTRACT)
        with Locations((-3.5, 2.275798656)):
            Rectangle(F6_W, F6_H, mode=Mode.SUBTRACT)
        with Locations((-3.5, 2.7857986465)):
            Rectangle(F6_W, F6_H, mode=Mode.SUBTRACT)
    extrude(amount=-F7_DEPTH, mode=Mode.SUBTRACT)


solid = f1.part
